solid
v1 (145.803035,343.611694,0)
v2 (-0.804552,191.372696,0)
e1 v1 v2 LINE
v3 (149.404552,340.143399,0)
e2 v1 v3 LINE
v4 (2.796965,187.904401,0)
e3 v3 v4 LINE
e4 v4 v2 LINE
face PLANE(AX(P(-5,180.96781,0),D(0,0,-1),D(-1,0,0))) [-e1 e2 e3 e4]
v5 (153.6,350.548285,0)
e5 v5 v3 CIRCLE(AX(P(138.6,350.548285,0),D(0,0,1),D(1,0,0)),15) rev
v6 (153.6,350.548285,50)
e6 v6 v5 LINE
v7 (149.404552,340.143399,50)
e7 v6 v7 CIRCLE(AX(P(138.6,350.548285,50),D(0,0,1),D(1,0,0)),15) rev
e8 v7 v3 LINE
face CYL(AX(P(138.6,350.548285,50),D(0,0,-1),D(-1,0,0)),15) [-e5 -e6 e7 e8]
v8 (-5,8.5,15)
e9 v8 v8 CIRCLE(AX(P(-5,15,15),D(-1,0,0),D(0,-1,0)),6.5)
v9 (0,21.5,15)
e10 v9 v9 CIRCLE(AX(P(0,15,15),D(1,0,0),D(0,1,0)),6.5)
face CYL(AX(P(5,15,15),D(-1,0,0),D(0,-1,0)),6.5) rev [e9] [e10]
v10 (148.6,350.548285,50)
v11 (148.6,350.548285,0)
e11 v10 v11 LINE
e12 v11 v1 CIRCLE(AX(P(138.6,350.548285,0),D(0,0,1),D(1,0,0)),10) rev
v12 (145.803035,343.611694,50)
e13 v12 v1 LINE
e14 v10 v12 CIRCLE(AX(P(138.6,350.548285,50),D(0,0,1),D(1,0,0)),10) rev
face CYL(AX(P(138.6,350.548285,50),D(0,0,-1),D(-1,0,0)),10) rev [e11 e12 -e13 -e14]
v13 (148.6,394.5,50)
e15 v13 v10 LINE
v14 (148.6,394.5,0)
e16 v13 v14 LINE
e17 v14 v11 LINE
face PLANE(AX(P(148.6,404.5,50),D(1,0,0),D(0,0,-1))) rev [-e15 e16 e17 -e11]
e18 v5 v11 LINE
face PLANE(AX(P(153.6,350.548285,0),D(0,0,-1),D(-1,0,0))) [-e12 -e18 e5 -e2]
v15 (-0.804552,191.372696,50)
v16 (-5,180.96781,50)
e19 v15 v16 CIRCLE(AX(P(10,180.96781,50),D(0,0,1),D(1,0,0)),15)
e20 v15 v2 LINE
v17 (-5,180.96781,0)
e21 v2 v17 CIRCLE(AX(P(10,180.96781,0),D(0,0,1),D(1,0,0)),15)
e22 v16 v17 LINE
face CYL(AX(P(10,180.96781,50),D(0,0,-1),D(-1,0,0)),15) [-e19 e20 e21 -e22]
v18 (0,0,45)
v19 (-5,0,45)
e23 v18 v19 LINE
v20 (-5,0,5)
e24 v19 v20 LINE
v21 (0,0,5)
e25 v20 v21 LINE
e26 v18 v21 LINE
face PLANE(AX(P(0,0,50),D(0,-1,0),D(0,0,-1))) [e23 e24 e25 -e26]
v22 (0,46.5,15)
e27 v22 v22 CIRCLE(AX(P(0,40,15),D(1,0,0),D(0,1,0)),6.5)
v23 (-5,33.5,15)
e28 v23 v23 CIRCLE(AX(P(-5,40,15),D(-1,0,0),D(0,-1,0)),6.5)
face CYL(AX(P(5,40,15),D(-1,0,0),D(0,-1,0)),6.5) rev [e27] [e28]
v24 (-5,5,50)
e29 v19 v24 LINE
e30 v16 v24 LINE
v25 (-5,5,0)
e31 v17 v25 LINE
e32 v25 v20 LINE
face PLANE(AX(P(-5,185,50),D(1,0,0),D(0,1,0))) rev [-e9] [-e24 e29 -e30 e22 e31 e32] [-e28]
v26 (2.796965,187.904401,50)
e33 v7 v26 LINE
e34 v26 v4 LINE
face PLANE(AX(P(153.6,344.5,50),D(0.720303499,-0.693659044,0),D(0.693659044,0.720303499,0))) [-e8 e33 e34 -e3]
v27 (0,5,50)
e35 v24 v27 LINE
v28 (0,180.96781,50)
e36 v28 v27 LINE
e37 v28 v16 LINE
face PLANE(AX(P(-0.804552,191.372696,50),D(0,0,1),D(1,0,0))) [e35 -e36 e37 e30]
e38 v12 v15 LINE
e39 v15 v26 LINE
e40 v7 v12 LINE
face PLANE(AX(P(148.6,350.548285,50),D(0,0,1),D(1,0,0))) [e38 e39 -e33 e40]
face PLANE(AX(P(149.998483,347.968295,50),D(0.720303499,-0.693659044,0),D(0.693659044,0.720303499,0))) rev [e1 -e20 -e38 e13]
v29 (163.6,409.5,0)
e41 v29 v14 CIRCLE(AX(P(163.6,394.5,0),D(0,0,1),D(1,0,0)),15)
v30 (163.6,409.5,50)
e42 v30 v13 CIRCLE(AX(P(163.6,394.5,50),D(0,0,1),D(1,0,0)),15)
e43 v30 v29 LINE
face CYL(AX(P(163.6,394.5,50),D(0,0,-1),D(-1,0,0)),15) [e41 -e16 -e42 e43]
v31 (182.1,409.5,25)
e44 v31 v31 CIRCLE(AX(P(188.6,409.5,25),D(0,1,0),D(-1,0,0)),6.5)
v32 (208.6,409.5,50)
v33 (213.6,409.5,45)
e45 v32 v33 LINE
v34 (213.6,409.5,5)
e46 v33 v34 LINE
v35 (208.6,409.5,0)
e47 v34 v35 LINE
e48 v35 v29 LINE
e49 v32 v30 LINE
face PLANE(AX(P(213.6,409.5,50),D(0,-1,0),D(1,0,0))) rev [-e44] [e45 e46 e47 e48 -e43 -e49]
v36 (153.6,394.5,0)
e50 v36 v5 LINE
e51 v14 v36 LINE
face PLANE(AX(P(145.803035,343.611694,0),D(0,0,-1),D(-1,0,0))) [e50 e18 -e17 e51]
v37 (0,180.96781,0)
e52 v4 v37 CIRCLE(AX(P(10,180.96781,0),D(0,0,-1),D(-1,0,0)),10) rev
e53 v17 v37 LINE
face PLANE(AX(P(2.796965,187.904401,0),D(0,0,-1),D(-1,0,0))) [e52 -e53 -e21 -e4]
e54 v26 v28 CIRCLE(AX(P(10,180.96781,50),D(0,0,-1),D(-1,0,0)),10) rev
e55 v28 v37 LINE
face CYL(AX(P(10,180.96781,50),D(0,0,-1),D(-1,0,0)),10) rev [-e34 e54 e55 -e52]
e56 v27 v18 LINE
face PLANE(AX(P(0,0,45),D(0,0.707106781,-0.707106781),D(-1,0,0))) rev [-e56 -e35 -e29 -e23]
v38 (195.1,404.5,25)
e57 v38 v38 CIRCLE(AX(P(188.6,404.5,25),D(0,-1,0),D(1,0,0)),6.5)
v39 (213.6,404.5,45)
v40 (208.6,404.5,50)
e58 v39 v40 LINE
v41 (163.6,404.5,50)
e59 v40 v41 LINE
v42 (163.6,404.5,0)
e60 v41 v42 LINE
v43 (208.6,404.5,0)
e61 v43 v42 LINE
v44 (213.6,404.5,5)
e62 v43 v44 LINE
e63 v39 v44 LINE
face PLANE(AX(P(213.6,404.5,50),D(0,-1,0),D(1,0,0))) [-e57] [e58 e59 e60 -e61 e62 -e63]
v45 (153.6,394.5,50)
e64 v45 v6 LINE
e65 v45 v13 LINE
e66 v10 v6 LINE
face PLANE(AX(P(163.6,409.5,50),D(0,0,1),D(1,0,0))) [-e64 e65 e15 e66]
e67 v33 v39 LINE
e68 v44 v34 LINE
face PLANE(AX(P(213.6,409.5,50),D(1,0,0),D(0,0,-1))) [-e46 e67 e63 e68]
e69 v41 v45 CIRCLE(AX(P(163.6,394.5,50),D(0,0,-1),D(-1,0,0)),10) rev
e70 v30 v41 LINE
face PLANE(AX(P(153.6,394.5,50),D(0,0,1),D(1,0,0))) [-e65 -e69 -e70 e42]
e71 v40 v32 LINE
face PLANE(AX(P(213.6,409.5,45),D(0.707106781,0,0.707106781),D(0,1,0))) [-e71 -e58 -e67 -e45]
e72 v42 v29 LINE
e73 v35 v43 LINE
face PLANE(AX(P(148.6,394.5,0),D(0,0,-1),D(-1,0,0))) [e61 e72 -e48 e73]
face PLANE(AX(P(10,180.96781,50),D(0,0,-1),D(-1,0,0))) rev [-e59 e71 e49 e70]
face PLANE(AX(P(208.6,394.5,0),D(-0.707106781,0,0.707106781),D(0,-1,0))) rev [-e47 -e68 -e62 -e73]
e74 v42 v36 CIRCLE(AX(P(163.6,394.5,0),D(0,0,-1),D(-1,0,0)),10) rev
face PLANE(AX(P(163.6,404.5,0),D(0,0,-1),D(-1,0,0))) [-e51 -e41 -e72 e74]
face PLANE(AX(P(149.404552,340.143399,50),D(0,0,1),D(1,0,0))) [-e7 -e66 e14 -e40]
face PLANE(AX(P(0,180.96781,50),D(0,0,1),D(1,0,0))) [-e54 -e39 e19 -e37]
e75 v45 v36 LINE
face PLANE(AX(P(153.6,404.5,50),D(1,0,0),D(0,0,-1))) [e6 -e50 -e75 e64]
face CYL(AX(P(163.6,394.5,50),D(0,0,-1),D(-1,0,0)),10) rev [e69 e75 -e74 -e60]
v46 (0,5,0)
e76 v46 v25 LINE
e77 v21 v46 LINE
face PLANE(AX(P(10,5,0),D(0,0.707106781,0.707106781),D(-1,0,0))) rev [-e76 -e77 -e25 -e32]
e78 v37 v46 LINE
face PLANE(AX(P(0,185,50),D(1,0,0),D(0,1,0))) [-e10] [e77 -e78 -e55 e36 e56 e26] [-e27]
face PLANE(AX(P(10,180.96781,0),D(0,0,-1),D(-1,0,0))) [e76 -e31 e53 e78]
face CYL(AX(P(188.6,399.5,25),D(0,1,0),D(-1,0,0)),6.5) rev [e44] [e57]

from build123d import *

# Parameters (mm, degrees)
SM_BASE_FLANGE_1_DEPTH = 50
SKETCH_6_R             = 6.5
CUT_EXTRUDE_1_DEPTH    = 10
SKETCH_7_R             = 6.5
CUT_EXTRUDE_2_DEPTH    = 10
OTHER_START            = 147.502474556
OTHER_1_OUTLINE_W      = 10
OTHER_1_OUTLINE_H      = 8
OTHER_1_DEPTH          = 3.535533905
OTHER_START_2          = 182.857813615
OTHER_1_2_OUTLINE_W    = 38
OTHER_1_2_OUTLINE_H    = 8
OTHER_1_2_DEPTH        = 3.535533906
OTHER_1_3_OUTLINE_W    = 7
OTHER_1_3_OUTLINE_H    = 10
OTHER_1_3_DEPTH        = 3.535533906
OTHER_START_3          = -35.355339059
OTHER_1_4_OUTLINE_W    = 7
OTHER_1_4_OUTLINE_H    = 38
OTHER_1_4_DEPTH        = 3.535533906


# Read off the part's stored shape, not the designer's step: Затупленный угол1
# Sheet-metal steps are written as plain solids
with BuildPart() as part:
    # Sketch 1 → Базовая кромка1 (new body)
    with BuildSketch(Plane.XY):
        with BuildLine():
            Line((213.6, 404.5), (163.6, 404.5))
            ThreePointArc((163.6, 404.5), (156.528932188, 401.571067812), (153.6, 394.5))
            Line((153.6, 394.5), (153.6, 350.548284888))
            ThreePointArc((153.6, 350.548284888), (152.511654958, 344.938841391), (149.404552488, 340.143399231))
            Line((149.404552488, 340.143399231), (2.796965008, 187.904400513))
            ThreePointArc((2.796965008, 187.904400513), (0.725563362, 184.707439072), (0, 180.967810075))
            Line((0, 180.967810075), (0, 0))
            Line((0, 0), (-5, 0))
            Line((-5, 0), (-5, 180.967810075))
            ThreePointArc((-5, 180.967810075), (-3.911654958, 186.577253571), (-0.804552488, 191.372695731))
            Line((-0.804552488, 191.372695731), (145.803034992, 343.61169445))
            ThreePointArc((145.803034992, 343.61169445), (147.874436638, 346.80865589), (148.6, 350.548284888))
            Line((148.6, 350.548284888), (148.6, 394.5))
            ThreePointArc((148.6, 394.5), (152.993398282, 405.106601718), (163.6, 409.5))
            Line((163.6, 409.5), (213.6, 409.5))
            Line((213.6, 409.5), (213.6, 404.5))
        make_face()
    extrude(amount=SM_BASE_FLANGE_1_DEPTH)

    # Эскиз6 → Вырез-Вытянуть1 (cut)
    with BuildSketch(Plane.ZY.offset(5)):
        with Locations(Location((15, 15, 0), (0, 0, 270))):
            Circle(SKETCH_6_R)
        with Locations(Location((15, 40, 0), (0, 0, 270))):
            Circle(SKETCH_6_R)
    extrude(amount=-CUT_EXTRUDE_1_DEPTH, mode=Mode.SUBTRACT)

    # Эскиз7 → Вырез-Вытянуть2 (cut)
    with BuildSketch(Plane(origin=(0, 409.5, 0), x_dir=(1, 0, 0), z_dir=(0, 1, 0))):
        with Locations(Location((188.6, -25, 0), (0, 0, 180))):
            Circle(SKETCH_7_R)
    extrude(amount=-CUT_EXTRUDE_2_DEPTH, mode=Mode.SUBTRACT)

    # Other 1 outline → Other 1 (cut)
    with BuildSketch(Plane(origin=(0, 0, 0), x_dir=(0.707106781186548, 0, 0.707106781186547), z_dir=(0.707106781186547, 0, -0.707106781186548)).offset(OTHER_START)):
        with Locations((151, -407)):
            Rectangle(OTHER_1_OUTLINE_W, OTHER_1_OUTLINE_H)
    extrude(amount=OTHER_1_DEPTH, mode=Mode.SUBTRACT)

    # Other 1 2 outline → Other 1 2 (cut)
    with BuildSketch(Plane(origin=(0, 0, 0), x_dir=(0.707106781186548, 0, -0.707106781186547), z_dir=(0.707106781186547, 0, 0.707106781186548)).offset(OTHER_START_2)):
        with Locations((130, 407)):
            Rectangle(OTHER_1_2_OUTLINE_W, OTHER_1_2_OUTLINE_H)
    extrude(amount=OTHER_1_2_DEPTH, mode=Mode.SUBTRACT)

    # Other 1 3 outline → Other 1 3 (cut)
    with BuildSketch(Plane(origin=(0, 0, 0), x_dir=(1, 0, 0), z_dir=(0, 0.707106781186547, 0.707106781186548))):
        with Locations((-2.5, 0)):
            Rectangle(OTHER_1_3_OUTLINE_W, OTHER_1_3_OUTLINE_H)
    extrude(amount=OTHER_1_3_DEPTH, mode=Mode.SUBTRACT)

    # Other 1 4 outline → Other 1 4 (cut)
    with BuildSketch(Plane(origin=(0, 0, 0), x_dir=(1, 0, 0), z_dir=(0, 0.707106781186547, -0.707106781186548)).offset(OTHER_START_3)):
        with Locations((-2.5, -21)):
            Rectangle(OTHER_1_4_OUTLINE_W, OTHER_1_4_OUTLINE_H)
    extrude(amount=OTHER_1_4_DEPTH, mode=Mode.SUBTRACT)


solid = part.part
